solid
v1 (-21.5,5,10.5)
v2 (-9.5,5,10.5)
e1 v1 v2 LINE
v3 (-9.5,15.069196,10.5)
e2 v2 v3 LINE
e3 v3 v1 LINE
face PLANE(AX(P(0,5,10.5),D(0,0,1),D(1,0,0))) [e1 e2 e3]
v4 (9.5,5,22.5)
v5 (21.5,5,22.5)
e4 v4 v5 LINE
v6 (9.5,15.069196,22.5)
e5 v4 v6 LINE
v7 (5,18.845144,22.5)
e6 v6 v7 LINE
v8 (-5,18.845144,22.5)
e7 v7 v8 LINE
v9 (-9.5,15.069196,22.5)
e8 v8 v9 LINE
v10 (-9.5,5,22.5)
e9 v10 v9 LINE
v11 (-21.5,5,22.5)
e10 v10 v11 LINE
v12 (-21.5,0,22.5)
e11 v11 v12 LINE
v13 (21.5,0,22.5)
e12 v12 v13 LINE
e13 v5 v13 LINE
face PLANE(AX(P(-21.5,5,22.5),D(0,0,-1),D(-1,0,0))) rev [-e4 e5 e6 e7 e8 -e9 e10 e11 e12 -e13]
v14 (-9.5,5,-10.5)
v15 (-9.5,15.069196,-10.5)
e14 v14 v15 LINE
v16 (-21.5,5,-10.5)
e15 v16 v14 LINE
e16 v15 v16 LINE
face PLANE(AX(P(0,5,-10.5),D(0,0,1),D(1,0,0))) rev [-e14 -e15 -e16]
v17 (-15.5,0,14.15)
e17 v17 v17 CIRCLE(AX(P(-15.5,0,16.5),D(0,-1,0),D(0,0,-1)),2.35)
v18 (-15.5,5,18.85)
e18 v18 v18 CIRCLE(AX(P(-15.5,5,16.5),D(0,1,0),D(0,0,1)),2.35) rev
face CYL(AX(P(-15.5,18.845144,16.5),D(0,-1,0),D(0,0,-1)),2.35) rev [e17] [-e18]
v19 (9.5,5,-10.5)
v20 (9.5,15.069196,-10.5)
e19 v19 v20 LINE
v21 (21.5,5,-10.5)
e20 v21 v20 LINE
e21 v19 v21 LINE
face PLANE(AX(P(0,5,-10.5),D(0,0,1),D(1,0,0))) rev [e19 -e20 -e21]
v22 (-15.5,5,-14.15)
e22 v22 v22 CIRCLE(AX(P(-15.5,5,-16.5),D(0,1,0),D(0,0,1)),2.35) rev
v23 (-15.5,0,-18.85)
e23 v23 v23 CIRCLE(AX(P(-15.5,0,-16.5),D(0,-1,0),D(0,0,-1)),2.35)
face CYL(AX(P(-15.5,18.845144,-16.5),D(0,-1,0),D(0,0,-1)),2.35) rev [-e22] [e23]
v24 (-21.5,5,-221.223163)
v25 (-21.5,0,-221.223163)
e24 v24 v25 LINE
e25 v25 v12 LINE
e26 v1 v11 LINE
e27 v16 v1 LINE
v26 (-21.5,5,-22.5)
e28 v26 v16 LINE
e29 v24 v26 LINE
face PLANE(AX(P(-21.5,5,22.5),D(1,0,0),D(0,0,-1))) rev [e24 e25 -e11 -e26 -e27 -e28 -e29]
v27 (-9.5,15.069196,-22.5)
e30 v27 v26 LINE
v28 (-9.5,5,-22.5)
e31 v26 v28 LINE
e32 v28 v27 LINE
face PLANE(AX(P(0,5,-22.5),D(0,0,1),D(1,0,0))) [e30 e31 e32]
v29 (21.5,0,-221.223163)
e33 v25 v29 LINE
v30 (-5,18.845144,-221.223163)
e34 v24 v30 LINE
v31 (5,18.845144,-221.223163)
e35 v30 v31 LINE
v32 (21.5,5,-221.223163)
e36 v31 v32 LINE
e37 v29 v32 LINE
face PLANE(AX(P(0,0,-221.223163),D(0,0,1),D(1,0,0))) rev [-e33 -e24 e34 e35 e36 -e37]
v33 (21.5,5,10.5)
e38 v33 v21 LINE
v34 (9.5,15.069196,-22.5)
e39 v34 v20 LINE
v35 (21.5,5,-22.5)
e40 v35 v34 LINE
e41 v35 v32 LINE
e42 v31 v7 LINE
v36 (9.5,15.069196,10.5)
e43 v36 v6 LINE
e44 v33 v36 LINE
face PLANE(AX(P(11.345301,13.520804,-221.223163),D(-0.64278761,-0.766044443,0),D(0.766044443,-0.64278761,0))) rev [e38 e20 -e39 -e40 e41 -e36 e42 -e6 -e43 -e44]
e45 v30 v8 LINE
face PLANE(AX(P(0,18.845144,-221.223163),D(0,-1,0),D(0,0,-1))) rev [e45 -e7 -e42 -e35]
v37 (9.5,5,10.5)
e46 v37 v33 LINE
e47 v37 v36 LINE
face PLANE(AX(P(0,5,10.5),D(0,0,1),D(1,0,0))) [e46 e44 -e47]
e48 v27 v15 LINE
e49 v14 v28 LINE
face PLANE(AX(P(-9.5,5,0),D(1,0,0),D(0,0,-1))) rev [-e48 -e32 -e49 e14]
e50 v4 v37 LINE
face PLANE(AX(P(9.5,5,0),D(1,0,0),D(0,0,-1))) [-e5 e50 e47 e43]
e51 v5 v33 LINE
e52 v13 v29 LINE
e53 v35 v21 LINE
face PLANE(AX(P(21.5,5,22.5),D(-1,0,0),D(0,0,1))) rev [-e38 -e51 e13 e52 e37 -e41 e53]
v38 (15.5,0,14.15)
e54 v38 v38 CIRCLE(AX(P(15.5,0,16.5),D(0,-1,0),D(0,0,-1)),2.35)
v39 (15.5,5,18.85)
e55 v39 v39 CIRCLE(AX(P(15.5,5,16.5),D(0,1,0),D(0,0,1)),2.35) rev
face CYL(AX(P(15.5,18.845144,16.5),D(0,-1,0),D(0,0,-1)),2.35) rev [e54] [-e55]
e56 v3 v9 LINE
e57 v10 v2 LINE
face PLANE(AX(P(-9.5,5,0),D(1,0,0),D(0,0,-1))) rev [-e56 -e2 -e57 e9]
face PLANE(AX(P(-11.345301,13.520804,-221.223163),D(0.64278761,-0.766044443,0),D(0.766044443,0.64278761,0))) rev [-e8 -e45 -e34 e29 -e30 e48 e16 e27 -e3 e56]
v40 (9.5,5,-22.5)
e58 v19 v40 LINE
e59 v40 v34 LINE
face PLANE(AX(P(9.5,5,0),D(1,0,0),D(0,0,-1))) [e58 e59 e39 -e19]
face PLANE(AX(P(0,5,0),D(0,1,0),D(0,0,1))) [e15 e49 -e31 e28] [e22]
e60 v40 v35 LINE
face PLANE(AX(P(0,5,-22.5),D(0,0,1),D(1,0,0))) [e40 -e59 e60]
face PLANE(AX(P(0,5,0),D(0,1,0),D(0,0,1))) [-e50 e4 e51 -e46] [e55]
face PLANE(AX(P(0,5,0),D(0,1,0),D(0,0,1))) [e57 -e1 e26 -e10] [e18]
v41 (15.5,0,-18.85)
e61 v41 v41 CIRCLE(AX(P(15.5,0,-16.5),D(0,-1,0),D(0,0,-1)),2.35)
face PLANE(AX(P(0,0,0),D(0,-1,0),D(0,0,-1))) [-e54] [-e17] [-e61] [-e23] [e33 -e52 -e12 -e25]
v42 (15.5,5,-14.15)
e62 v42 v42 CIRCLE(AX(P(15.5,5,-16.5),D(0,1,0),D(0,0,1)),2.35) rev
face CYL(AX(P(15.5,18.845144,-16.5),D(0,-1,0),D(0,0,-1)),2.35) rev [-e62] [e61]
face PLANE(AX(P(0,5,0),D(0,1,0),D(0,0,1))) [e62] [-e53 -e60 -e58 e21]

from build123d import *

# Parameters (mm, degrees)
SKETCH1_W                = 43
SKETCH1_H                = 45
BOSS_EXTRUDE1_DEPTH      = 5
BOSS_EXTRUDE2_DEPTH      = 22.5
BOSS_EXTRUDE2_DEPTH_BACK = 221.22316262
SKETCH4_W                = 43
SKETCH4_H                = 5
SKETCH5_R                = 2.35
CUT_EXTRUDE2_DEPTH       = 224.06294432
CUT_EXTRUDE3_START       = -13.845143914
CUT_EXTRUDE3_OUTLINE_W   = 12
CUT_EXTRUDE3_OUTLINE_H   = 12
CUT_EXTRUDE3_OUTLINE_R   = 2.35
CUT_EXTRUDE3_DEPTH       = 10.069195574


# Read off the part's stored shape, not the designer's step: Cut-Extrude3
with BuildPart() as part:
    # Sketch1 → Boss-Extrude1 (new body)
    with BuildSketch(Plane(origin=(0, 0, 0), x_dir=(1, 0, 0), z_dir=(0, 1, 0))):
        Rectangle(SKETCH1_W, SKETCH1_H)
    extrude(amount=BOSS_EXTRUDE1_DEPTH)

    # Sketch4 → Boss-Extrude2 (add, two sides: drawn at the far end of the back side and taken through both)
    with BuildSketch(Plane.XY.offset(-BOSS_EXTRUDE2_DEPTH_BACK)):
        Polygon((21.5, 5), (-21.5, 5), (-5, 18.845143914), (5, 18.845143914), align=None)
        with Locations((0, 2.5)):
            Rectangle(SKETCH4_W, SKETCH4_H)
    extrude(amount=BOSS_EXTRUDE2_DEPTH + BOSS_EXTRUDE2_DEPTH_BACK)

    # Sketch5 → Cut-Extrude2 (cut, through all)
    with BuildSketch(Plane.XZ):
        with Locations(Location((15.5, -16.5, 0), (0, 0, 270))):
            Circle(SKETCH5_R)
        with Locations(Location((-15.5, -16.5, 0), (0, 0, 270))):
            Circle(SKETCH5_R)
        with Locations(Location((-15.5, 16.5, 0), (0, 0, 270))):
            Circle(SKETCH5_R)
        with Locations(Location((15.5, 16.5, 0), (0, 0, 270))):
            Circle(SKETCH5_R)
    extrude(amount=-CUT_EXTRUDE2_DEPTH, mode=Mode.SUBTRACT)

    # Cut-Extrude3 outline → Cut-Extrude3 (cut)
    # profile 1 of 4: a face of its own
    with BuildSketch(Plane(origin=(0, 18.845143914, 0), x_dir=(1, 0, 0), z_dir=(0, 1, 0)).offset(CUT_EXTRUDE3_START)):
        with Locations((-15.5, 16.5)):
            Rectangle(CUT_EXTRUDE3_OUTLINE_W, CUT_EXTRUDE3_OUTLINE_H)
        with Locations((-15.5, 16.5)):
            Circle(CUT_EXTRUDE3_OUTLINE_R, mode=Mode.SUBTRACT)
    # profile 2 of 4: a face of its own
    with BuildSketch(Plane(origin=(0, 18.845143914, 0), x_dir=(1, 0, 0), z_dir=(0, 1, 0)).offset(CUT_EXTRUDE3_START)):
        with Locations((-15.5, -16.5)):
            Rectangle(CUT_EXTRUDE3_OUTLINE_W, CUT_EXTRUDE3_OUTLINE_H)
        with Locations((-15.5, -16.5)):
            Circle(CUT_EXTRUDE3_OUTLINE_R, mode=Mode.SUBTRACT)
    # profile 3 of 4: a face of its own
    with BuildSketch(Plane(origin=(0, 18.845143914, 0), x_dir=(1, 0, 0), z_dir=(0, 1, 0)).offset(CUT_EXTRUDE3_START)):
        with Locations((15.5, 16.5)):
            Rectangle(CUT_EXTRUDE3_OUTLINE_W, CUT_EXTRUDE3_OUTLINE_H)
        with Locations((15.5, 16.5)):
            Circle(CUT_EXTRUDE3_OUTLINE_R, mode=Mode.SUBTRACT)
    # profile 4 of 4: a face of its own
    with BuildSketch(Plane(origin=(0, 18.845143914, 0), x_dir=(1, 0, 0), z_dir=(0, 1, 0)).offset(CUT_EXTRUDE3_START)):
        with Locations((15.5, -16.5)):
            Rectangle(CUT_EXTRUDE3_OUTLINE_W, CUT_EXTRUDE3_OUTLINE_H)
        with Locations((15.5, -16.5)):
            Circle(CUT_EXTRUDE3_OUTLINE_R, mode=Mode.SUBTRACT)
    extrude(amount=CUT_EXTRUDE3_DEPTH, mode=Mode.SUBTRACT)


solid = part.part
